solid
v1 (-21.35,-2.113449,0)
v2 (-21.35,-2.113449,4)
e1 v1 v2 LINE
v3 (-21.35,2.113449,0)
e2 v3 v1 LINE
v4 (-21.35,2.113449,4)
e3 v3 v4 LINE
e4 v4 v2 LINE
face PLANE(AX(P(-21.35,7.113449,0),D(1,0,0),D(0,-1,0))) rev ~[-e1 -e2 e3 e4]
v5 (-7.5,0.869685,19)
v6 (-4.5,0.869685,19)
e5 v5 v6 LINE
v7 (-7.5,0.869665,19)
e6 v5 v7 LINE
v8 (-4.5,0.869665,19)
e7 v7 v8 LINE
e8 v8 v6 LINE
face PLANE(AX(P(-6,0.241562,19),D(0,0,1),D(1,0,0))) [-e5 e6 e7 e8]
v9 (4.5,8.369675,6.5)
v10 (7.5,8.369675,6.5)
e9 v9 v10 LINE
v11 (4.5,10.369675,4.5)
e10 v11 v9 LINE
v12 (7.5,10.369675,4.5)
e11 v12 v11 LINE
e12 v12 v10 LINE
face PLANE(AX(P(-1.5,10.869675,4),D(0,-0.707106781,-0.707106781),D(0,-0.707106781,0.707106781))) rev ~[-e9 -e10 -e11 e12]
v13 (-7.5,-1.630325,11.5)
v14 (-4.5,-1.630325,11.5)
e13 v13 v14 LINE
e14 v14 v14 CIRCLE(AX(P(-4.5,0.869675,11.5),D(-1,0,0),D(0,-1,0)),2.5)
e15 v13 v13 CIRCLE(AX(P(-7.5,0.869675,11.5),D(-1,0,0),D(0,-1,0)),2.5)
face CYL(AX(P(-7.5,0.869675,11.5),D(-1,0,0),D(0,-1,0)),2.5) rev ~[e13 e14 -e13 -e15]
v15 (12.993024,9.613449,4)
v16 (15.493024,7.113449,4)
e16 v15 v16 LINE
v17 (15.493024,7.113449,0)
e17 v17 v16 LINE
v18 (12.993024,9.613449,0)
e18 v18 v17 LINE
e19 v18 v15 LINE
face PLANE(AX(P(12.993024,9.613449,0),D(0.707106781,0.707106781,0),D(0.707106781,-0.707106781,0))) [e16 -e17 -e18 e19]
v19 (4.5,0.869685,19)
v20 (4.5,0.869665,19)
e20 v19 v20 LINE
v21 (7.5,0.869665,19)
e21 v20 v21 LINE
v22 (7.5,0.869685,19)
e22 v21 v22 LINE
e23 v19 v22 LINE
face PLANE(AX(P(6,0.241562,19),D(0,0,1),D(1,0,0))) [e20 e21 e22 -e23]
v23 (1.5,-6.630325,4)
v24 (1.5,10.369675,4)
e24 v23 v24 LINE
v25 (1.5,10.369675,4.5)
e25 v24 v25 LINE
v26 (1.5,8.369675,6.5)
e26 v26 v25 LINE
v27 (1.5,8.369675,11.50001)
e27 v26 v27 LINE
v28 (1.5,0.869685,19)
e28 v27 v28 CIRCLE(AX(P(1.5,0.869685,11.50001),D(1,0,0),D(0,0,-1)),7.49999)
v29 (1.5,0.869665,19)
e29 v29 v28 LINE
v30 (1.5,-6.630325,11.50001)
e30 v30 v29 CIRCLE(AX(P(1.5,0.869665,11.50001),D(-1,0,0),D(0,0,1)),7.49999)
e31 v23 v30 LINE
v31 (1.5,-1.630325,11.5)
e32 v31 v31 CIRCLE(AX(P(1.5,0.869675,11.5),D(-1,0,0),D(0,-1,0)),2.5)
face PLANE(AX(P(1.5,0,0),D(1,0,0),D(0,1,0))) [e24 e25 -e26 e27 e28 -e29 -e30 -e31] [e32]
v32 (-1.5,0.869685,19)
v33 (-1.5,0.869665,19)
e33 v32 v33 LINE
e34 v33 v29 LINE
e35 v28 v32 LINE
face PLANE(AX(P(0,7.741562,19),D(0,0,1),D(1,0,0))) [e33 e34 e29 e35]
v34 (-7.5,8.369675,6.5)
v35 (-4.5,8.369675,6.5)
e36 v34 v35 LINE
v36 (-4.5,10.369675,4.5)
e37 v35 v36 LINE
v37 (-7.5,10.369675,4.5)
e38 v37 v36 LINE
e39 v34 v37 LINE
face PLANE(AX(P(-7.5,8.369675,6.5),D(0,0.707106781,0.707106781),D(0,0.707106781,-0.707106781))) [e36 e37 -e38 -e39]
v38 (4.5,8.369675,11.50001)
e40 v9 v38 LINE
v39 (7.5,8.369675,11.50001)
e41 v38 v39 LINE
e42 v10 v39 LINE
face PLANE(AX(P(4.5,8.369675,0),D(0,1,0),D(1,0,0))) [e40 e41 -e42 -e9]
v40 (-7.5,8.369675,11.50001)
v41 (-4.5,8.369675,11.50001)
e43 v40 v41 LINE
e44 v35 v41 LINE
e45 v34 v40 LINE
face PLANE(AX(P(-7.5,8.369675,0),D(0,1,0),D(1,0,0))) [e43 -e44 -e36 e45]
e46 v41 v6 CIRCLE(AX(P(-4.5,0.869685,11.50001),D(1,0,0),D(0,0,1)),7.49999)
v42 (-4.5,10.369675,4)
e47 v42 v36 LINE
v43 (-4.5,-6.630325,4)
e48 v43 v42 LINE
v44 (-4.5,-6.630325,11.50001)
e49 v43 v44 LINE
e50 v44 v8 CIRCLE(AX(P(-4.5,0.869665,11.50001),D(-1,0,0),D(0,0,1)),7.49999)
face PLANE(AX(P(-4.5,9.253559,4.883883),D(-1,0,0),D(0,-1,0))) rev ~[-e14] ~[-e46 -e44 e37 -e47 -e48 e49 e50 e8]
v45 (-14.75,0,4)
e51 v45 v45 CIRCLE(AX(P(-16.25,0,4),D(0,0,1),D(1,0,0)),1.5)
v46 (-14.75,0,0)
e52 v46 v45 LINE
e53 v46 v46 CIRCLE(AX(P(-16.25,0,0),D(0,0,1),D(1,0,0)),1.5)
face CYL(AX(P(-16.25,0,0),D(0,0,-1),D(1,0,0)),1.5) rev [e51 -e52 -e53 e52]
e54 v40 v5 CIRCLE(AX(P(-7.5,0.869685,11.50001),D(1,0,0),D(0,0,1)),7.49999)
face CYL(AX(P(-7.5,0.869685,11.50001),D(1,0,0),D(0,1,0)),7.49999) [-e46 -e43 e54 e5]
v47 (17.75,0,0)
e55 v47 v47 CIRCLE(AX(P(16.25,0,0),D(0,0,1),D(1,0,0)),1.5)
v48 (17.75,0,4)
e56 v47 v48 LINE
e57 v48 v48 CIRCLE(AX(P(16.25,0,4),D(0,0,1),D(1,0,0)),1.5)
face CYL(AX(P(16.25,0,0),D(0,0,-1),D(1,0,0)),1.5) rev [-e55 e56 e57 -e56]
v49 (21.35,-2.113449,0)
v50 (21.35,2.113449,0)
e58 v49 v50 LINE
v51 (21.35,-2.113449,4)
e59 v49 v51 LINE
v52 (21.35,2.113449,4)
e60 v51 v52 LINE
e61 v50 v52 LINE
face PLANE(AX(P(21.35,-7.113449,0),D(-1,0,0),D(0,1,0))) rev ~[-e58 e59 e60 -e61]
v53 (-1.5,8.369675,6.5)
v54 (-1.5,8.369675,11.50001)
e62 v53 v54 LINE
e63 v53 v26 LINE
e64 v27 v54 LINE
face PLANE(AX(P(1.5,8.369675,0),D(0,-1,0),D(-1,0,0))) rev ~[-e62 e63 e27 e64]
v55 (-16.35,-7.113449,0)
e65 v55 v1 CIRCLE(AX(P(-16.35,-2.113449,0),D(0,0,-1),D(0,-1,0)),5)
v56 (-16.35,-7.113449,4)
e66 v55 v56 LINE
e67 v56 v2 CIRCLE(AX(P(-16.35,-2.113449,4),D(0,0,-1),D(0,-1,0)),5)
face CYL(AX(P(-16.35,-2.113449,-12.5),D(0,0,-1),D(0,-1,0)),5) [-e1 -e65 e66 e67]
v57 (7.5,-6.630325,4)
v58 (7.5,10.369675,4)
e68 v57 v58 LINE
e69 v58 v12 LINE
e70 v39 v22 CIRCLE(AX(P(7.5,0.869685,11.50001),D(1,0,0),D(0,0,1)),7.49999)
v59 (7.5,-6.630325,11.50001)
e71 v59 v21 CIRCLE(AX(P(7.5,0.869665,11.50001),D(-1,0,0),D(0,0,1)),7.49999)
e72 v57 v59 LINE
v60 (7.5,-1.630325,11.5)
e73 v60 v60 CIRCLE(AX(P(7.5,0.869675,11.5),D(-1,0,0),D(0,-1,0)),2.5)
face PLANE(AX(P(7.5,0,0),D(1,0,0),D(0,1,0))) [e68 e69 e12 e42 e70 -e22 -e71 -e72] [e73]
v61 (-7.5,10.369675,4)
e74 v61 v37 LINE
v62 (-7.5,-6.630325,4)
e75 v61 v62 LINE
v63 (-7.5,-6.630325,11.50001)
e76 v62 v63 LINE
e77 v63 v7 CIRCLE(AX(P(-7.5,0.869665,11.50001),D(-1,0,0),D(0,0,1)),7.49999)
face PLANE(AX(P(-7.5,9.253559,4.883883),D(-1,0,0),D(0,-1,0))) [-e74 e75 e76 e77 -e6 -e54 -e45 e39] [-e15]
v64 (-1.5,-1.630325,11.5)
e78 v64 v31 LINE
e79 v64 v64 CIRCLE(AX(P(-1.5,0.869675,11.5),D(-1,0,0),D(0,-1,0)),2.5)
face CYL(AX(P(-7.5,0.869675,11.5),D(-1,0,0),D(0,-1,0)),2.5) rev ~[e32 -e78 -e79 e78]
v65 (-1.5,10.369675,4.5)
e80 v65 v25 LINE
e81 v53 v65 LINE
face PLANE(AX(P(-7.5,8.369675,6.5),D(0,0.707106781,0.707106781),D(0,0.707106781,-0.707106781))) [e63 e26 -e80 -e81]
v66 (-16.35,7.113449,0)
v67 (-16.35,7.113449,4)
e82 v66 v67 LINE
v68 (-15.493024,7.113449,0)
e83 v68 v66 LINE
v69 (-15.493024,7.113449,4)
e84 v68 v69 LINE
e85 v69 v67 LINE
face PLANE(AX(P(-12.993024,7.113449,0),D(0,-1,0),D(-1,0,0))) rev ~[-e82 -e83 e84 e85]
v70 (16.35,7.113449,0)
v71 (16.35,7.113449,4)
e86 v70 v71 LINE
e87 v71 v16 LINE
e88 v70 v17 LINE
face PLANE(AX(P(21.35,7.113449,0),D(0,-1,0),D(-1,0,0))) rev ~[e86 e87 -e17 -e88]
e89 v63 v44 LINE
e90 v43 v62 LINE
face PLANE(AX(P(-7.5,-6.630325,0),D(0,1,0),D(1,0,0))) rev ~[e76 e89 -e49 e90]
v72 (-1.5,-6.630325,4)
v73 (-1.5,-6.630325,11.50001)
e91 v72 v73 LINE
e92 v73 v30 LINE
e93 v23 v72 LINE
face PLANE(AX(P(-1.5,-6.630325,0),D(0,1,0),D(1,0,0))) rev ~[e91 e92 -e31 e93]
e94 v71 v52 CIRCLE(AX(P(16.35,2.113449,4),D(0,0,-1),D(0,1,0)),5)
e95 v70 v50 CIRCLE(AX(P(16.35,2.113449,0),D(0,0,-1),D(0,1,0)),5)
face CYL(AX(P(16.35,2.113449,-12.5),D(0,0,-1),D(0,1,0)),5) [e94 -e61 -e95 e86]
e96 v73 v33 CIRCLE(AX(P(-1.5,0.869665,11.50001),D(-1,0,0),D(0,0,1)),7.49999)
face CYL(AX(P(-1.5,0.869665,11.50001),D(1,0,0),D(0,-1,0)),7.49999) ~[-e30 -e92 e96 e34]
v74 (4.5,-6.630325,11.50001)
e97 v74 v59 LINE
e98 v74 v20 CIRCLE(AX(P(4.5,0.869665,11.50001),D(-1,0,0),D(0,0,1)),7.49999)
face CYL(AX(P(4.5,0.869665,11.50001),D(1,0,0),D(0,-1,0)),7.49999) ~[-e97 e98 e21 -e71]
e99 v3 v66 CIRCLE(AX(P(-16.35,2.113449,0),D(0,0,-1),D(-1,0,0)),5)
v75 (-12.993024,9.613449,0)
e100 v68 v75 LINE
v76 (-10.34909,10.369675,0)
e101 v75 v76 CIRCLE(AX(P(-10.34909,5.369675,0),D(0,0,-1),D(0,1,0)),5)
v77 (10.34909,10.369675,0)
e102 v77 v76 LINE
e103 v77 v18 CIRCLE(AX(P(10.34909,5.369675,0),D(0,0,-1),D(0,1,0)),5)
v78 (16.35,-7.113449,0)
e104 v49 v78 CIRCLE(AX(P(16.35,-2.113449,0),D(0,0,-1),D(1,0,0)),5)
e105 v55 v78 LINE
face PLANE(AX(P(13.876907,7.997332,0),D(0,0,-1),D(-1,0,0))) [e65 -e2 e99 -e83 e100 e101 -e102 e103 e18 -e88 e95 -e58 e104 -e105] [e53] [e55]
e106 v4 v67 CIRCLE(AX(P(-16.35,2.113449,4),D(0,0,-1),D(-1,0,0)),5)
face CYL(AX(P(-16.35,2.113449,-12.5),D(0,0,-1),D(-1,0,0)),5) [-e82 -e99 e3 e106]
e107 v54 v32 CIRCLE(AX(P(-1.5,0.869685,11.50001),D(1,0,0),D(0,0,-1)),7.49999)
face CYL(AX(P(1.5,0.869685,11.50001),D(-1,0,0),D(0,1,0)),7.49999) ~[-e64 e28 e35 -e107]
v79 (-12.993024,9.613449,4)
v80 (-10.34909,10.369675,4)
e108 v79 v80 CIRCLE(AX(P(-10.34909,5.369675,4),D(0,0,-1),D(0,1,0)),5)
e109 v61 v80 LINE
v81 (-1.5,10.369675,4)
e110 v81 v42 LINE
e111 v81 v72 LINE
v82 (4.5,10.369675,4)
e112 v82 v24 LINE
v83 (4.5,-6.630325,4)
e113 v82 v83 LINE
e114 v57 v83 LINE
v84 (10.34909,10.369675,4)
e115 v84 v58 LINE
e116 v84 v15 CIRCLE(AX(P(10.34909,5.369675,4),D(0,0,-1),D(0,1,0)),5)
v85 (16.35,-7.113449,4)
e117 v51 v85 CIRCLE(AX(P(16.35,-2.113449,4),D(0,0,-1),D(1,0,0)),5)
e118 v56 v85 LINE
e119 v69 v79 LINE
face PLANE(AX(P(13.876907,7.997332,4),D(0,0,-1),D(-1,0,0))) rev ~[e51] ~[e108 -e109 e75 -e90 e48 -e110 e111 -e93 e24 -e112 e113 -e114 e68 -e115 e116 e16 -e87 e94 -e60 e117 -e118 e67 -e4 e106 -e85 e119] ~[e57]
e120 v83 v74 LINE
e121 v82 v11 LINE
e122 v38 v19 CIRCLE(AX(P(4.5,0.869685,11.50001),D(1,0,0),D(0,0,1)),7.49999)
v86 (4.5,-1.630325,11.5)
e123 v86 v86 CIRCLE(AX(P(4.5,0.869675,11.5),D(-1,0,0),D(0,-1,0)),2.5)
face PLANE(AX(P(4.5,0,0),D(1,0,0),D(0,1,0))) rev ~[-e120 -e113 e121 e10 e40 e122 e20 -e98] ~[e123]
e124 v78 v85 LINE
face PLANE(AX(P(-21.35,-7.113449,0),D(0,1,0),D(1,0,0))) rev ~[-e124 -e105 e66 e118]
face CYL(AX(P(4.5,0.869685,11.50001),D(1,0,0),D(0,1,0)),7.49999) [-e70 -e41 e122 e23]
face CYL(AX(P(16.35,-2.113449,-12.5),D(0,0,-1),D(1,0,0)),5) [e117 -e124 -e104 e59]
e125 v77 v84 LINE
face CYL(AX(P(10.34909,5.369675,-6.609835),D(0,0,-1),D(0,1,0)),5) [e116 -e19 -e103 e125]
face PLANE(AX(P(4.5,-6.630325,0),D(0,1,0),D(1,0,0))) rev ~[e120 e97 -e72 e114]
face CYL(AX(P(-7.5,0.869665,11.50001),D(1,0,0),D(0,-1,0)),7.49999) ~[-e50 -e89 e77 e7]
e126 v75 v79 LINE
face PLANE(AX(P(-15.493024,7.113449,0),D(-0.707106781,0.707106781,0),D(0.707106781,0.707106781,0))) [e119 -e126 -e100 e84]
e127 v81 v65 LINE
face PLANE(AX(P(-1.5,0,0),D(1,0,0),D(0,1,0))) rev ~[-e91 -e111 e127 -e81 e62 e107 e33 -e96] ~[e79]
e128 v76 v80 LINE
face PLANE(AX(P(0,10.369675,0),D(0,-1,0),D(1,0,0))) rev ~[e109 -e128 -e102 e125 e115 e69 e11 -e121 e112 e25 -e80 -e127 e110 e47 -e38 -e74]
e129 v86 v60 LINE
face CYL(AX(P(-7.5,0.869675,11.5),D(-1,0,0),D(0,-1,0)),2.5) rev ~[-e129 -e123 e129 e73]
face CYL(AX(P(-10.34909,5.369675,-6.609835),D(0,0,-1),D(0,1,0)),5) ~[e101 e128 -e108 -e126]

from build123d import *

# Parameters (mm, degrees)
F0_R         = 1.5
F0_W         = 3
F0_H         = 13.7437733207
F0_H_2       = 1.2562266793
F1_DEPTH     = 4
F2_DEPTH     = 19
F3_R         = 7.49999
F4_R         = 2.5
F5_DEPTH     = 28.851
F6_T1_DEPTH  = 4
F6_T6_DEPTH  = 3
F6_T11_DEPTH = 9.4292074699
F6_T18_DEPTH = 9.4292074699
F6_T25_DEPTH = 3
F6_T30_DEPTH = 9.4292074699
F6_T37_DEPTH = 9.4292074699
F6_T44_DEPTH = 3
F7_T1_DEPTH  = 17.2196709514
F7_T3_DEPTH  = 29


# Not quite as in the source:
# - a fillet or chamfer that OpenCascade refuses, or shapes differently, is made with other operations: its cross-section is extruded or revolved along the edge and cut away or added
# - a fillet or chamfer is up to 0.001 mm smaller than in the source, because OpenCascade refuses the exact size


with BuildPart() as f1:
    # F0 (on Top) → F1 (new body)
    with BuildSketch(Plane.XY):
        Polygon((-12.9930239742, 7.1134486855), (-21.35, 7.1134486855), (-21.35, -7.1134486855), (21.35, -7.1134486855), (21.35, 7.1134486855), (12.9930239742, 7.1134486855), (7.5, 7.1134486855), (7.5, -6.6303246352), (4.5, -6.6303246352), (4.5, 7.1134486855), (1.5, 7.1134486855), (1.5, -6.6303246352), (-1.5, -6.6303246352), (-1.5, 7.1134486855), (-4.5, 7.1134486855), (-4.5, -6.6303246352), (-7.5, -6.6303246352), (-7.5, 7.1134486855), align=None)
        with Locations((-16.25, 0)):
            Circle(F0_R, mode=Mode.SUBTRACT)
        with Locations((16.25, 0)):
            Circle(F0_R, mode=Mode.SUBTRACT)
        Polygon((-12.9930239742, 10.3696753648), (-12.9930239742, 7.1134486855), (-7.5, 7.1134486855), (-7.5, 8.3696753648), (-4.5, 8.3696753648), (-1.5, 8.3696753648), (1.5, 8.3696753648), (4.5, 8.3696753648), (7.5, 8.3696753648), (7.5, 7.1134486855), (12.9930239742, 7.1134486855), (12.9930239742, 10.3696753648), align=None)
        with Locations((-6, 0.2415620252)):
            Rectangle(F0_W, F0_H)
        with Locations((-6, 7.7415620252)):
            Rectangle(F0_W, F0_H_2)
        with Locations((-3, 7.7415620252)):
            Rectangle(F0_W, F0_H_2)
        Polygon((-1.5, 8.3696753648), (-1.5, 7.1134486855), (0, 7.1134486855), (1.5, 7.1134486855), (1.5, 8.3696753648), align=None)
        Polygon((0, 7.1134486855), (-1.5, 7.1134486855), (-1.5, -6.6303246352), (1.5, -6.6303246352), (1.5, 7.1134486855), align=None)
        with Locations((3, 7.7415620252)):
            Rectangle(F0_W, F0_H_2)
        with Locations((6, 0.2415620252)):
            Rectangle(F0_W, F0_H)
        with Locations((6, 7.7415620252)):
            Rectangle(F0_W, F0_H_2)
    extrude(amount=F1_DEPTH)

    # F0 (on Top) → F2 (join)
    with BuildSketch(Plane.XY):
        with Locations((-6, 0.2415620252)):
            Rectangle(F0_W, F0_H)
        with Locations((-6, 7.7415620252)):
            Rectangle(F0_W, F0_H_2)
        Polygon((-1.5, 8.3696753648), (-1.5, 7.1134486855), (0, 7.1134486855), (1.5, 7.1134486855), (1.5, 8.3696753648), align=None)
        Polygon((0, 7.1134486855), (-1.5, 7.1134486855), (-1.5, -6.6303246352), (1.5, -6.6303246352), (1.5, 7.1134486855), align=None)
        with Locations((6, 0.2415620252)):
            Rectangle(F0_W, F0_H)
        with Locations((6, 7.7415620252)):
            Rectangle(F0_W, F0_H_2)
    extrude(amount=F2_DEPTH)

    # F3 (radius 7.5 in the source; OpenCascade refuses exactly that, so slightly less here)
    f3_edges = [f1.edges().sort_by_distance(p)[0] for p in [
        (-6, -6.630325, 19),
        (0, -6.630325, 19),
        (6, -6.630325, 19),
        (6, 8.369675, 19),
        (0, 8.369675, 19),
        (-6, 8.369675, 19),
    ]]
    fillet(f3_edges, radius=F3_R)

    # F4 (on face) → F5 (cut, through all)
    with BuildSketch(Plane(origin=(-7.5, 0, 0), x_dir=(0, -1, 0), z_dir=(-1, 0, 0))):
        with Locations((-0.8696753648, 11.5)):
            Circle(F4_R)
    extrude(amount=-F5_DEPTH, mode=Mode.SUBTRACT)

    # F6: chamfer of 2.5 on 5 edges, made by hand

    # F6_s2 → F6_t1 (join)
    with BuildSketch(Plane.XY):
        Polygon((12.9930239742, 9.6134486855), (15.4930239742, 7.1134486855), (12.9930239742, 7.1134486855), align=None)
        Polygon((-15.4930239742, 7.1134486855), (-12.9930239742, 9.6134486855), (-12.9930239742, 7.1134486855), align=None)
    extrude(amount=F6_T1_DEPTH)


with BuildPart() as f6_tool4:
    # F6_s5 → F6_t6 (new body)
    with BuildSketch(Plane.YZ.offset(-7.5)):
        Polygon((8.3696753648, 6.5), (10.8696753648, 4), (8.3696753648, 4), align=None)
    extrude(amount=F6_T6_DEPTH)

    split(bisect_by=Plane.XZ.offset(-10.3696753648), keep=Keep.TOP)


with BuildPart() as f1_1:
    add(f1.part)

    # F6_t3: union F6_tool4
    add(f6_tool4.part)


with BuildPart() as f6_tool9:
    # F6_s10 → F6_t11 (new body)
    with BuildSketch(Plane.YZ.offset(-7.5)):
        Polygon((8.3696753648, 6.5), (10.8696753648, 4), (8.3696753648, 4), align=None)
    extrude(amount=F6_T11_DEPTH)

    split(bisect_by=Plane.XZ.offset(-10.3696753648), keep=Keep.TOP)

    split(bisect_by=Plane.YZ.offset(-1.5), keep=Keep.TOP)

    split(bisect_by=Plane.YZ.offset(1.5), keep=Keep.BOTTOM)


with BuildPart() as f1_2:
    add(f1_1.part)

    # F6_t8: union F6_tool9
    add(f6_tool9.part)


with BuildPart() as f6_tool16:
    # F6_s17 → F6_t18 (new body)
    with BuildSketch(Plane.YZ.offset(-7.9292074699)):
        Polygon((10.8696753648, 4), (8.3696753648, 6.5), (8.3696753648, 4), align=None)
    extrude(amount=F6_T18_DEPTH)

    split(bisect_by=Plane.YZ.offset(-7.5), keep=Keep.TOP)

    split(bisect_by=Plane.YZ.offset(-4.5), keep=Keep.BOTTOM)

    split(bisect_by=Plane.XZ.offset(-10.3696753648), keep=Keep.TOP)


with BuildPart() as f1_3:
    add(f1_2.part)

    # F6_t15: union F6_tool16
    add(f6_tool16.part)


with BuildPart() as f6_tool23:
    # F6_s24 → F6_t25 (new body)
    with BuildSketch(Plane.YZ.offset(-1.5)):
        Polygon((10.8696753648, 4), (8.3696753648, 6.5), (8.3696753648, 4), align=None)
    extrude(amount=F6_T25_DEPTH)

    split(bisect_by=Plane.XZ.offset(-10.3696753648), keep=Keep.TOP)


with BuildPart() as f1_4:
    add(f1_3.part)

    # F6_t22: union F6_tool23
    add(f6_tool23.part)


with BuildPart() as f6_tool28:
    # F6_s29 → F6_t30 (new body)
    with BuildSketch(Plane.YZ.offset(-1.5)):
        Polygon((10.8696753648, 4), (8.3696753648, 6.5), (8.3696753648, 4), align=None)
    extrude(amount=F6_T30_DEPTH)

    split(bisect_by=Plane.XZ.offset(-10.3696753648), keep=Keep.TOP)

    split(bisect_by=Plane.YZ.offset(4.5), keep=Keep.TOP)

    split(bisect_by=Plane.YZ.offset(7.5), keep=Keep.BOTTOM)


with BuildPart() as f1_5:
    add(f1_4.part)

    # F6_t27: union F6_tool28
    add(f6_tool28.part)


with BuildPart() as f6_tool35:
    # F6_s36 → F6_t37 (new body)
    with BuildSketch(Plane.YZ.offset(-1.9292074699)):
        Polygon((10.8696753648, 4), (8.3696753648, 6.5), (8.3696753648, 4), align=None)
    extrude(amount=F6_T37_DEPTH)

    split(bisect_by=Plane.XZ.offset(-10.3696753648), keep=Keep.TOP)

    split(bisect_by=Plane.YZ.offset(-1.5), keep=Keep.TOP)

    split(bisect_by=Plane.YZ.offset(1.5), keep=Keep.BOTTOM)


with BuildPart() as f1_6:
    add(f1_5.part)

    # F6_t34: union F6_tool35
    add(f6_tool35.part)


with BuildPart() as f6_tool42:
    # F6_s43 → F6_t44 (new body)
    with BuildSketch(Plane.YZ.offset(4.5)):
        Polygon((10.8696753648, 4), (8.3696753648, 6.5), (8.3696753648, 4), align=None)
    extrude(amount=F6_T44_DEPTH)

    split(bisect_by=Plane.XZ.offset(-10.3696753648), keep=Keep.TOP)


with BuildPart() as f1_7:
    add(f1_6.part)

    # F6_t41: union F6_tool42
    add(f6_tool42.part)

    # F7: fillet of radius 5 on 6 edges, made by hand

    # F7_s2 → F7_t1 (cut)
    with BuildSketch(Plane.XY.offset(-6.6098354757)):
        with BuildLine():
            ThreePointArc((10.3490897839, 10.3696753648), (11.7240685831, 10.1769025595), (12.9930239742, 9.6134486855))
            Line((12.9930239742, 9.6134486855), (12.9930239742, 10.3696753648))
            Line((12.9930239742, 10.3696753648), (10.3490897839, 10.3696753648))
        make_face()
        with BuildLine():
            ThreePointArc((-10.3490897839, 10.3696753648), (-11.7240685831, 10.1769025595), (-12.9930239742, 9.6134486855))
            Line((-12.9930239742, 9.6134486855), (-12.9930239742, 10.3696753648))
            Line((-12.9930239742, 10.3696753648), (-10.3490897839, 10.3696753648))
        make_face()
    extrude(amount=F7_T1_DEPTH, mode=Mode.SUBTRACT)

    # F7_s4 → F7_t3 (cut)
    with BuildSketch(Plane.XY.offset(-12.5)):
        with BuildLine():
            ThreePointArc((-21.35, 2.1134486855), (-19.8855339059, 5.6489825915), (-16.35, 7.1134486855))
            Line((-16.35, 7.1134486855), (-21.35, 7.1134486855))
            Line((-21.35, 7.1134486855), (-21.35, 2.1134486855))
        make_face()
        with BuildLine():
            ThreePointArc((-16.35, -7.1134486855), (-19.8855339059, -5.6489825915), (-21.35, -2.1134486855))
            Line((-21.35, -2.1134486855), (-21.35, -7.1134486855))
            Line((-21.35, -7.1134486855), (-16.35, -7.1134486855))
        make_face()
        with BuildLine():
            ThreePointArc((21.35, -2.1134486855), (19.8855339059, -5.6489825915), (16.35, -7.1134486855))
            Line((16.35, -7.1134486855), (21.35, -7.1134486855))
            Line((21.35, -7.1134486855), (21.35, -2.1134486855))
        make_face()
        with BuildLine():
            ThreePointArc((16.35, 7.1134486855), (19.8855339059, 5.6489825915), (21.35, 2.1134486855))
            Line((21.35, 2.1134486855), (21.35, 7.1134486855))
            Line((21.35, 7.1134486855), (16.35, 7.1134486855))
        make_face()
    extrude(amount=F7_T3_DEPTH, mode=Mode.SUBTRACT)


solid = f1_7.part
